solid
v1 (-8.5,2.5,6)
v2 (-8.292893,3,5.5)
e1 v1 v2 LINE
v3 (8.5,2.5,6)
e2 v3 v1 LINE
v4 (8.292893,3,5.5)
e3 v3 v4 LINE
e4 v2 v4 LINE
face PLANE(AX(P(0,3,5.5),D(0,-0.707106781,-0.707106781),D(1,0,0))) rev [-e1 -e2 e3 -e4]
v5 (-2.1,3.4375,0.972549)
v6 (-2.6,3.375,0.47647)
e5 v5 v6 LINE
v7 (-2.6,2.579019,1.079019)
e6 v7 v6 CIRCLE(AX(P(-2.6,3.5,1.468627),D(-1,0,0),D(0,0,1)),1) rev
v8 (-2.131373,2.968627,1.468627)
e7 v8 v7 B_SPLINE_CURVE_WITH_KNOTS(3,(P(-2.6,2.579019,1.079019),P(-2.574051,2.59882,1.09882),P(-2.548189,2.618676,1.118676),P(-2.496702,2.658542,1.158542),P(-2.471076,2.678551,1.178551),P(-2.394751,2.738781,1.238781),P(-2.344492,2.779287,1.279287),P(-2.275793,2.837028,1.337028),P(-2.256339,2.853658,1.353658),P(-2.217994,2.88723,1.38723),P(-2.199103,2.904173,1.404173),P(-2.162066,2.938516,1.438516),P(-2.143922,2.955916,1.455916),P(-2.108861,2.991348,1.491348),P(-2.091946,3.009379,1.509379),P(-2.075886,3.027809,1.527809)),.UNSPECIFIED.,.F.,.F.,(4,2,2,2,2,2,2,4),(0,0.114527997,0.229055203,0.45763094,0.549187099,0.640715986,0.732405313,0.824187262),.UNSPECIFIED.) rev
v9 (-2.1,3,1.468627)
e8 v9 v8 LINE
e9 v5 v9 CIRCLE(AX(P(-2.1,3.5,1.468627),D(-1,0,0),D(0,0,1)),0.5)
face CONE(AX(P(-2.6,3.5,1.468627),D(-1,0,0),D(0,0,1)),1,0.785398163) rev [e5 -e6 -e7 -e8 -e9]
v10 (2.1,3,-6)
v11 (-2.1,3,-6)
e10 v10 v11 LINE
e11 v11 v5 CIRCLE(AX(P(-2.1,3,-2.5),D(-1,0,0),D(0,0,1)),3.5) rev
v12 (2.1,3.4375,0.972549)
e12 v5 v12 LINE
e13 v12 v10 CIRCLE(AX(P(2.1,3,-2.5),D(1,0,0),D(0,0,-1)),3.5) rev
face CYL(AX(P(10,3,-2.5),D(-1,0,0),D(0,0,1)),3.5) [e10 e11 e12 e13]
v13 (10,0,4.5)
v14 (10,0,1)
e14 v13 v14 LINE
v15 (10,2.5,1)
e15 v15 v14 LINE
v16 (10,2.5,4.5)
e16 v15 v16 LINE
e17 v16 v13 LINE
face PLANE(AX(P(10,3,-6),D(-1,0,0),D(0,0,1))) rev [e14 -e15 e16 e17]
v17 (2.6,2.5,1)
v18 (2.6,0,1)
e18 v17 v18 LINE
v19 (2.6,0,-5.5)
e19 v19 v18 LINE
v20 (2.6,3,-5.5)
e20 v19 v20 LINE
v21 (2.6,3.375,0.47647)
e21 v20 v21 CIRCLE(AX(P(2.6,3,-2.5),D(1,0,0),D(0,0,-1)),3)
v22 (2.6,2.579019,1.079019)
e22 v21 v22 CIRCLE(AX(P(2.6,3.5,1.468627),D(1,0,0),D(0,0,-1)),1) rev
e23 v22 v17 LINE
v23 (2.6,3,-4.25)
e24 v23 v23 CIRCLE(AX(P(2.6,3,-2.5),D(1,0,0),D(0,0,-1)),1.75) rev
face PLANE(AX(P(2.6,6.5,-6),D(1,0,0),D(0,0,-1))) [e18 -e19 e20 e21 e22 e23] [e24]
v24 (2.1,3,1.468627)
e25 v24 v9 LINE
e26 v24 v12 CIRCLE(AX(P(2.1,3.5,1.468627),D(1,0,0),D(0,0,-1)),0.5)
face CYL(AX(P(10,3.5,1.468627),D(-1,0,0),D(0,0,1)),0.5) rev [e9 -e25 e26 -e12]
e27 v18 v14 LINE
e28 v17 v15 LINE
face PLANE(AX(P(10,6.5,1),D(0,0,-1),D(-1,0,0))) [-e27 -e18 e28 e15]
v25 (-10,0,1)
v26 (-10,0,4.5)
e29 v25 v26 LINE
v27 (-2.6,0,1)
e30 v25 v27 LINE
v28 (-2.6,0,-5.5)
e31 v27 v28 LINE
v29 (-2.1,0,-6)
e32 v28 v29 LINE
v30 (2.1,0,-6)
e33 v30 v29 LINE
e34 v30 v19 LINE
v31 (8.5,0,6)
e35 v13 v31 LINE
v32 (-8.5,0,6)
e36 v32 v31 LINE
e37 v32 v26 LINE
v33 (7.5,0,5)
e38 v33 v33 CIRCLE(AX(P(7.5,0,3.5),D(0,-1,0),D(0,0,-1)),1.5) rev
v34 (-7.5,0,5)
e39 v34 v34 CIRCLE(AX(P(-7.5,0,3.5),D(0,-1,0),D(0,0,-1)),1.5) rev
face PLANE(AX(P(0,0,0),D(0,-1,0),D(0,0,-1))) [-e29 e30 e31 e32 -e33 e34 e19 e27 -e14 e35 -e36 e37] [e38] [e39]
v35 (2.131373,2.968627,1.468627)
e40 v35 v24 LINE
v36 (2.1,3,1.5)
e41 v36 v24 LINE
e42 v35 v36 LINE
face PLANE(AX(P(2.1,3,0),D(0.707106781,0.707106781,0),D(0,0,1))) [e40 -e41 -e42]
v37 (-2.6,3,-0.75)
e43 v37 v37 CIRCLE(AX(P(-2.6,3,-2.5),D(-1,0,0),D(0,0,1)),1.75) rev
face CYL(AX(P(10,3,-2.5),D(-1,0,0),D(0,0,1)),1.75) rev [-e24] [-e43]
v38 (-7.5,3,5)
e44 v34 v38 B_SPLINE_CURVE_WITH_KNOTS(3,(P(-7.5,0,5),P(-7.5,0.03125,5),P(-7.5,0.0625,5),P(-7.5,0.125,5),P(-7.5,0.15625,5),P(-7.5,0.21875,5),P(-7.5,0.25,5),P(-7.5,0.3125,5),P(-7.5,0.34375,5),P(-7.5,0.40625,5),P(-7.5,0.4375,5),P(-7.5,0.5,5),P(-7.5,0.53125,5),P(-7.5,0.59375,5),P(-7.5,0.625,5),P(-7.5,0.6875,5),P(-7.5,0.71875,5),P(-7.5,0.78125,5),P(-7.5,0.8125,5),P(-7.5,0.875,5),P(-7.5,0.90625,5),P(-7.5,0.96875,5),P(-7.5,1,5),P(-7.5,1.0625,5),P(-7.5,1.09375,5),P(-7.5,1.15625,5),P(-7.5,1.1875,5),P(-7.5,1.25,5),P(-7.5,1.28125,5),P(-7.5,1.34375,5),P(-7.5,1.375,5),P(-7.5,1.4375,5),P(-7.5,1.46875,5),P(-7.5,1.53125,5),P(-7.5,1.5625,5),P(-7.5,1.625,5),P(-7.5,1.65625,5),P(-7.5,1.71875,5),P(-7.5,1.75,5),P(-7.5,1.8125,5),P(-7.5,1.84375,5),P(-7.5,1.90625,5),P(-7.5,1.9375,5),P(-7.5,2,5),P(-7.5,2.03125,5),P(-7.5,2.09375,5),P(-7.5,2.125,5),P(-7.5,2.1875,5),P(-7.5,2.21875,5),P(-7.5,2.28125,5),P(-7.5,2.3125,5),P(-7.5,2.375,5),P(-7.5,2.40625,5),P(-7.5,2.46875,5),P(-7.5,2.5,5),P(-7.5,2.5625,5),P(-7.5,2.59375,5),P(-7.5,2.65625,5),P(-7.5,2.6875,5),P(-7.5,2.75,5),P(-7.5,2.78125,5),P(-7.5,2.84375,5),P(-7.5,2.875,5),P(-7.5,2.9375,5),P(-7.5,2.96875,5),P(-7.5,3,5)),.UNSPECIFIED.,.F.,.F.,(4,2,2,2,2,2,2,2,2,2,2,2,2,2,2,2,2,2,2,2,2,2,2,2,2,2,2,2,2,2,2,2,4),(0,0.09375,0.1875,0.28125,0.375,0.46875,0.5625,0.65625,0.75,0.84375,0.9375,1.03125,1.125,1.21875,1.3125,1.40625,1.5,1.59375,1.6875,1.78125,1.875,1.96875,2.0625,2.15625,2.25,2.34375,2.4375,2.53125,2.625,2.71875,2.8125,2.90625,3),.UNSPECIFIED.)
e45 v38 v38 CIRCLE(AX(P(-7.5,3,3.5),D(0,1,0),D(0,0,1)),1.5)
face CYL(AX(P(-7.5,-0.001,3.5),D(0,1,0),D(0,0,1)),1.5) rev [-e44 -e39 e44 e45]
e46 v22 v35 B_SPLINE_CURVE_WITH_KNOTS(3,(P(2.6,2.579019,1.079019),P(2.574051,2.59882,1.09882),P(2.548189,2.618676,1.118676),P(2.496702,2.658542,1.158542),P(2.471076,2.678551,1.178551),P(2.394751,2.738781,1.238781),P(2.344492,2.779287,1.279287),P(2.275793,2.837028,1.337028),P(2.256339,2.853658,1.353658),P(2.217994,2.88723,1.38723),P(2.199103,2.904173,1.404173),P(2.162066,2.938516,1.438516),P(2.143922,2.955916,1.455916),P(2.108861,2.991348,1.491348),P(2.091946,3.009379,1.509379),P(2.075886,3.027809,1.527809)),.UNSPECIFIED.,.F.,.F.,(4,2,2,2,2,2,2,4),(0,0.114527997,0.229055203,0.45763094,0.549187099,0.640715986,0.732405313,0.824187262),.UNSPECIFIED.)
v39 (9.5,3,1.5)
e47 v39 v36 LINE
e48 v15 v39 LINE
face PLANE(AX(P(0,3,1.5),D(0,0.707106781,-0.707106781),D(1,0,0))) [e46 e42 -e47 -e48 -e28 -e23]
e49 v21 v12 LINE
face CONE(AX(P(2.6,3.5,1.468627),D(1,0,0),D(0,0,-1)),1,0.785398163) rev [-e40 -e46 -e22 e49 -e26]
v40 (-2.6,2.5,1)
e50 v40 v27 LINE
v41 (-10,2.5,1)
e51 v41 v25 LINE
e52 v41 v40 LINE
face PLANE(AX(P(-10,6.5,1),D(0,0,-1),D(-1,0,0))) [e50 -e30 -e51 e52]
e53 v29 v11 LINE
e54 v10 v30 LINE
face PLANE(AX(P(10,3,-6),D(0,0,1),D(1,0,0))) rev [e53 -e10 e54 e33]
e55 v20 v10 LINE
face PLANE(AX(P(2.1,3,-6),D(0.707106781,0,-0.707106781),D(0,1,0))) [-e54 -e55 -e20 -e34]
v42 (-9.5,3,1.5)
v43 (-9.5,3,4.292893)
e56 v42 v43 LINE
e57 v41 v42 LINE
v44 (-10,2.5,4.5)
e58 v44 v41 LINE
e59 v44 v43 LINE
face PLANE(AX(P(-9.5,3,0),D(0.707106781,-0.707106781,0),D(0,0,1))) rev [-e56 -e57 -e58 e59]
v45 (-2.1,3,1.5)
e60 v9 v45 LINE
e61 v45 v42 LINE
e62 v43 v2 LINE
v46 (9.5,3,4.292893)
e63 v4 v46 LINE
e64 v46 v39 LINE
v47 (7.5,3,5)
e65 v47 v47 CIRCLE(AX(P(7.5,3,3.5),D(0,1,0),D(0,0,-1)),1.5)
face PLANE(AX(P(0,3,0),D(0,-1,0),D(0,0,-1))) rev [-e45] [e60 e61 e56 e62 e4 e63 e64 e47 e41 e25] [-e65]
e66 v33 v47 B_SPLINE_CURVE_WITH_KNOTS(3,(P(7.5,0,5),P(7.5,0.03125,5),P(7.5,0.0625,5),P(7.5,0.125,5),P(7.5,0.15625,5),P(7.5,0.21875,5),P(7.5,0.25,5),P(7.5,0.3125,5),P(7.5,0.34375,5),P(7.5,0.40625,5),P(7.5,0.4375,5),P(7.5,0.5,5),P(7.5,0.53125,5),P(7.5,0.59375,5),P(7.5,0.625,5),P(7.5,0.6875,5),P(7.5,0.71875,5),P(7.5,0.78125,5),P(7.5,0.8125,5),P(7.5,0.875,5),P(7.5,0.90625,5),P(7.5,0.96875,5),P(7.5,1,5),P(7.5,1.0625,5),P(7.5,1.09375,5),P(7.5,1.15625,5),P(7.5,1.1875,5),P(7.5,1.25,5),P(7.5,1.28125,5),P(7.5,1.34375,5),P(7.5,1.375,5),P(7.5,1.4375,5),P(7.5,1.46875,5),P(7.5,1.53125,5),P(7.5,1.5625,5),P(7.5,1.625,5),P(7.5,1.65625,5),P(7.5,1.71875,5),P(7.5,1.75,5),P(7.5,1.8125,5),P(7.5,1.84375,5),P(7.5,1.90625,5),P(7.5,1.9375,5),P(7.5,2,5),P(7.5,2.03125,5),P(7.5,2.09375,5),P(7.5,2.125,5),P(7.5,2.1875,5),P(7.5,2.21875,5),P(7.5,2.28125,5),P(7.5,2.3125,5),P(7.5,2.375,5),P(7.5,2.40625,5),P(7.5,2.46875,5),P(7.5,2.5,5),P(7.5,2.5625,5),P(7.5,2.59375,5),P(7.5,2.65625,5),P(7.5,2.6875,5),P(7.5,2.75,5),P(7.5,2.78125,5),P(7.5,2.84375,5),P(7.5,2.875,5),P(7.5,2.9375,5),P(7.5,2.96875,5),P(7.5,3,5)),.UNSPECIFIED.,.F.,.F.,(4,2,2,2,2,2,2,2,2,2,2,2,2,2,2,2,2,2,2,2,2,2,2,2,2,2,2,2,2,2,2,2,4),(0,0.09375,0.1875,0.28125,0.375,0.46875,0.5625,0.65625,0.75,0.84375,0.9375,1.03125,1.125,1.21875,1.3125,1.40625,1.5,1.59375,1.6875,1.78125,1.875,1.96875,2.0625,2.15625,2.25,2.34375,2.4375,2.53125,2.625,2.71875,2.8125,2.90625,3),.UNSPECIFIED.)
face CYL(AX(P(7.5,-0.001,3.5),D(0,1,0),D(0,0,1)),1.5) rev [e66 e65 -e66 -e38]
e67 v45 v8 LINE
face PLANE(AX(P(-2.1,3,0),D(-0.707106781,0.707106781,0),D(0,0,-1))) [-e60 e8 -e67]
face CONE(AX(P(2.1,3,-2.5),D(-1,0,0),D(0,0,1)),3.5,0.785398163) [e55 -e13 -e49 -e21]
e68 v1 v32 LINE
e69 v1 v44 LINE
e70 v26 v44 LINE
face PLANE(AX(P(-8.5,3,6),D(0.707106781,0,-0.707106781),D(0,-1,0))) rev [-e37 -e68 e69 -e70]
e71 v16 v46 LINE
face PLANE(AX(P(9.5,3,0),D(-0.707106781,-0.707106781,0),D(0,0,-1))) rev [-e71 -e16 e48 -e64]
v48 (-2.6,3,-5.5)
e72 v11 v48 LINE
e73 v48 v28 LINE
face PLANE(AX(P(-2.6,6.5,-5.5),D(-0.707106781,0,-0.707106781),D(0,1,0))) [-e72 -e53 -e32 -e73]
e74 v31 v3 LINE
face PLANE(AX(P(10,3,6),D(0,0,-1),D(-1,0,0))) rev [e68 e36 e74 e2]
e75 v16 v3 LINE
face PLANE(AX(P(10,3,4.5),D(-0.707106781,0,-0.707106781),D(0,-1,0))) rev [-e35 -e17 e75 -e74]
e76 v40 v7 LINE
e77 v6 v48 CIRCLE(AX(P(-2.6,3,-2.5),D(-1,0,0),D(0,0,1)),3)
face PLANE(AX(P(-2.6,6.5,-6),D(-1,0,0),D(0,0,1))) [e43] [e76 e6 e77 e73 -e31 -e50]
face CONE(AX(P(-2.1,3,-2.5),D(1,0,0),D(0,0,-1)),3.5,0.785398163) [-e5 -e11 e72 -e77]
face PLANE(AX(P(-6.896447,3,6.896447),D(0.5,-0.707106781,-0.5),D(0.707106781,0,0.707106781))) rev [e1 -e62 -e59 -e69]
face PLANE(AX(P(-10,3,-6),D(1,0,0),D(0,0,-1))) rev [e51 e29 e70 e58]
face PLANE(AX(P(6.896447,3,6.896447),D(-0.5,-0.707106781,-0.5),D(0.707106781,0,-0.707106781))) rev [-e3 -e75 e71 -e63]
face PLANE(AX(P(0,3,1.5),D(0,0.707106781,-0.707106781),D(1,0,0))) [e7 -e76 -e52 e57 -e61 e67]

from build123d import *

# Parameters (mm, degrees)
SKIZZE1_W                       = 20
SKIZZE1_H                       = 12
AUFSATZ_LINEAR_AUSTRAGEN1_DEPTH = 3
SCHNITT_LINEAR_AUSTRAGEN1_REACH = 14.042
SKIZZE2_R                       = 1.5
AUFSATZ_LINEAR_AUSTRAGEN2_DEPTH = 20
FASE1_SIZE                      = 1.5
SKIZZE4_R                       = 1.75
SCHNITT_LINEAR_AUSTRAGEN2_DEPTH = 22.868927729
SKIZZE5_W                       = 7.4
SKIZZE5_H                       = 7
SCHNITT_LINEAR_AUSTRAGEN5_DEPTH = 14.351029923
FASE2_SIZE                      = 0.5
VERRUNDUNG1_R                   = 0.5
FASE3_SIZE                      = 0.5


with BuildPart() as part:
    # Skizze1 → Aufsatz-Linear austragen1 (new body)
    with BuildSketch(Plane(origin=(0, 0, 0), x_dir=(1, 0, 0), z_dir=(0, 1, 0))):
        Rectangle(SKIZZE1_W, SKIZZE1_H)
    extrude(amount=AUFSATZ_LINEAR_AUSTRAGEN1_DEPTH)

    # Skizze2 → Schnitt-Linear austragen1 (cut, up to next)
    with BuildSketch(Plane(origin=(0, 3, 0), x_dir=(1, 0, 0), z_dir=(0, 1, 0)), mode=Mode.PRIVATE) as schnitt_linear_austragen1_sk1:
        with Locations(Location((-7.5, -3.5, 0), (0, 0, 270))):
            Circle(SKIZZE2_R)
    schnitt_linear_austragen1_tool1 = extrude(schnitt_linear_austragen1_sk1.sketch, amount=-SCHNITT_LINEAR_AUSTRAGEN1_REACH, mode=Mode.PRIVATE) & part.part
    # Skizze2 → Schnitt-Linear austragen1 (cut, up to next)
    with BuildSketch(Plane(origin=(0, 3, 0), x_dir=(1, 0, 0), z_dir=(0, 1, 0)), mode=Mode.PRIVATE) as schnitt_linear_austragen1_sk2:
        with Locations(Location((7.5, -3.5, 0), (0, 0, 270))):
            Circle(SKIZZE2_R)
    schnitt_linear_austragen1_tool2 = extrude(schnitt_linear_austragen1_sk2.sketch, amount=-SCHNITT_LINEAR_AUSTRAGEN1_REACH, mode=Mode.PRIVATE) & part.part
    add(schnitt_linear_austragen1_tool1.solids().sort_by_distance((-7.5, 3, 3.5))[0], mode=Mode.SUBTRACT)
    add(schnitt_linear_austragen1_tool2.solids().sort_by_distance((7.5, 3, 3.5))[0], mode=Mode.SUBTRACT)

    # Skizze3 → Aufsatz-Linear austragen2 (add)
    with BuildSketch(Plane.ZY.offset(10)):
        with BuildLine():
            Line((-6, 3), (1, 3))
            ThreePointArc((1, 3), (-2.5, 6.5), (-6, 3))
        make_face()
    extrude(amount=-AUFSATZ_LINEAR_AUSTRAGEN2_DEPTH)

    # Fase1
    fase1_edges = [part.edges().sort_by_distance(p)[0] for p in [
        (10, 1.5, 6),
        (-10, 1.5, 6),
    ]]
    chamfer(fase1_edges, length=FASE1_SIZE)

    # Skizze4 → Schnitt-Linear austragen2 (cut, through all)
    with BuildSketch(Plane.ZY.offset(10)):
        with Locations((-2.5, 3)):
            Circle(SKIZZE4_R)
    extrude(amount=-SCHNITT_LINEAR_AUSTRAGEN2_DEPTH, mode=Mode.SUBTRACT)

    # Skizze5 → Schnitt-Linear austragen5 (cut, through all)
    with BuildSketch(Plane(origin=(0, 0, 0), x_dir=(1, 0, 0), z_dir=(0, 1, 0))):
        with Locations((-6.3, 2.5)):
            Rectangle(SKIZZE5_W, SKIZZE5_H)
        with Locations((6.3, 2.5)):
            Rectangle(SKIZZE5_W, SKIZZE5_H)
    extrude(amount=SCHNITT_LINEAR_AUSTRAGEN5_DEPTH, mode=Mode.SUBTRACT)

    # Fase2
    fase2_edges = [part.edges().sort_by_distance(p)[0] for p in [
        (-10, 3, 2.75),
        (6.3, 3, 1),
        (10, 3, 2.75),
        (0, 3, 6),
        (-9.25, 3, 5.25),
        (9.25, 3, 5.25),
        (-6.3, 3, 1),
    ]]
    chamfer(fase2_edges, length=FASE2_SIZE)

    # Verrundung1
    verrundung1_edges = [part.edges().sort_by_distance(p)[0] for p in [
        (0, 3, 1),
    ]]
    fillet(verrundung1_edges, radius=VERRUNDUNG1_R)

    # Fase3
    # the kernel refuses this chamfer: 0.5 mm, written as the material it takes off along each edge
    with BuildSketch(Plane(origin=(2.6, 3, 1.468626967), x_dir=(-0.9996219169112968, 0.027495876610586487, 0), z_dir=(0, 0, 1))) as fase3_piece_1_section:
        Polygon((FASE3_SIZE * 0.999621916911, FASE3_SIZE * 0.0274958766106), (-FASE3_SIZE * 0.0274958766106, FASE3_SIZE * 0.999621916911), (0, 0), align=None)
    fase3_piece_1 = extrude(amount=1.317214527, mode=Mode.PRIVATE)
    fase3_piece_1 = split(fase3_piece_1, bisect_by=Plane(origin=(2.355172989, 2.984397258, 1.484397258), z_dir=(0, 0.7071067811865476, -0.7071067811865476)), keep=Keep.TOP, mode=Mode.PRIVATE)
    add(fase3_piece_1, mode=Mode.SUBTRACT)
    with BuildSketch(Plane(origin=(-2.6, 3, 1.468626967), x_dir=(0.9996219169112968, 0.027495876610586487, 0), z_dir=(0, 0, 1))) as fase3_piece_2_section:
        Polygon((FASE3_SIZE * 0.999621916911, -FASE3_SIZE * 0.0274958766106), (-FASE3_SIZE * 0.0274958766106, -FASE3_SIZE * 0.999621916911), (0, 0), align=None)
    fase3_piece_2 = extrude(amount=1.317214527, mode=Mode.PRIVATE)
    fase3_piece_2 = split(fase3_piece_2, bisect_by=Plane(origin=(-2.355172989, 2.984397258, 1.484397258), z_dir=(0, 0.7071067811865476, -0.7071067811865476)), keep=Keep.TOP, mode=Mode.PRIVATE)
    add(fase3_piece_2, mode=Mode.SUBTRACT)
    with BuildSketch(Plane(origin=(2.6, 3, -2.5), x_dir=(0, 0.125, 0.9921567416492215), z_dir=(0, -0.9921567416492215, 0.125))) as fase3_piece_3:
        Polygon((3.5 - FASE3_SIZE, 0), (3.5, FASE3_SIZE), (3.5, 0), align=None)
    revolve(axis=Axis((2.6, 3, -2.5), (-1, 0, 0)), revolution_arc=172.819244219, mode=Mode.SUBTRACT)
    with BuildSketch(Plane(origin=(-2.6, 3.5, 1.468626967), x_dir=(0, -1, 0), z_dir=(0, 0, 1))) as fase3_piece_4_section:
        Polygon((0.5, FASE3_SIZE), (0.5 + FASE3_SIZE, 0), (0.5, 0), align=None)
    fase3_piece_4 = revolve(axis=Axis((-2.6, 3.5, 1.468626967), (1, 0, 0)), revolution_arc=82.819244219, mode=Mode.PRIVATE)
    fase3_piece_4 = split(fase3_piece_4, bisect_by=Plane(origin=(-2.375928001, 2.853387765, 1.353387765), z_dir=(0, 0.7071067811865476, -0.7071067811865476)), keep=Keep.TOP, mode=Mode.PRIVATE)
    add(fase3_piece_4, mode=Mode.SUBTRACT)
    with BuildSketch(Plane(origin=(2.6, 3.5, 1.468626967), x_dir=(0, -1, 0), z_dir=(0, 0, 1))) as fase3_piece_5_section:
        Polygon((0.5 + FASE3_SIZE, 0), (0.5, -FASE3_SIZE), (0.5, 0), align=None)
    fase3_piece_5 = revolve(axis=Axis((2.6, 3.5, 1.468626967), (1, 0, 0)), revolution_arc=82.819244219, mode=Mode.PRIVATE)
    fase3_piece_5 = split(fase3_piece_5, bisect_by=Plane(origin=(2.437201985, 2.797231412, 1.297231412), z_dir=(0, 0.7071067811865476, -0.7071067811865476)), keep=Keep.TOP, mode=Mode.PRIVATE)
    add(fase3_piece_5, mode=Mode.SUBTRACT)
    with BuildSketch(Plane(origin=(-2.6, 3, -2.5), x_dir=(0, 0.125, 0.9921567416492215), z_dir=(0, -0.9921567416492215, 0.125))) as fase3_piece_6:
        Polygon((3.5 - FASE3_SIZE, 0), (3.5, -FASE3_SIZE), (3.5, 0), align=None)
    revolve(axis=Axis((-2.6, 3, -2.5), (-1, 0, 0)), revolution_arc=172.819244219, mode=Mode.SUBTRACT)
    with BuildSketch(Plane(origin=(-2.6, -1.285841494, -6), x_dir=(-0.02749587661058651, 0, 0.9996219169112968), z_dir=(0, 1, 0))) as fase3_piece_7:
        Polygon((FASE3_SIZE * 0.999621916911, FASE3_SIZE * 0.0274958766106), (-FASE3_SIZE * 0.0274958766106, FASE3_SIZE * 0.999621916911), (0, 0), align=None)
    extrude(amount=4.285841494, mode=Mode.SUBTRACT)
    with BuildSketch(Plane(origin=(2.6, -1.285841494, -6), x_dir=(0.02749587661058651, 0, 0.9996219169112968), z_dir=(0, 1, 0))) as fase3_piece_8:
        Polygon((FASE3_SIZE * 0.999621916911, -FASE3_SIZE * 0.0274958766106), (-FASE3_SIZE * 0.0274958766106, -FASE3_SIZE * 0.999621916911), (0, 0), align=None)
    extrude(amount=4.285841494, mode=Mode.SUBTRACT)


solid = part.part
